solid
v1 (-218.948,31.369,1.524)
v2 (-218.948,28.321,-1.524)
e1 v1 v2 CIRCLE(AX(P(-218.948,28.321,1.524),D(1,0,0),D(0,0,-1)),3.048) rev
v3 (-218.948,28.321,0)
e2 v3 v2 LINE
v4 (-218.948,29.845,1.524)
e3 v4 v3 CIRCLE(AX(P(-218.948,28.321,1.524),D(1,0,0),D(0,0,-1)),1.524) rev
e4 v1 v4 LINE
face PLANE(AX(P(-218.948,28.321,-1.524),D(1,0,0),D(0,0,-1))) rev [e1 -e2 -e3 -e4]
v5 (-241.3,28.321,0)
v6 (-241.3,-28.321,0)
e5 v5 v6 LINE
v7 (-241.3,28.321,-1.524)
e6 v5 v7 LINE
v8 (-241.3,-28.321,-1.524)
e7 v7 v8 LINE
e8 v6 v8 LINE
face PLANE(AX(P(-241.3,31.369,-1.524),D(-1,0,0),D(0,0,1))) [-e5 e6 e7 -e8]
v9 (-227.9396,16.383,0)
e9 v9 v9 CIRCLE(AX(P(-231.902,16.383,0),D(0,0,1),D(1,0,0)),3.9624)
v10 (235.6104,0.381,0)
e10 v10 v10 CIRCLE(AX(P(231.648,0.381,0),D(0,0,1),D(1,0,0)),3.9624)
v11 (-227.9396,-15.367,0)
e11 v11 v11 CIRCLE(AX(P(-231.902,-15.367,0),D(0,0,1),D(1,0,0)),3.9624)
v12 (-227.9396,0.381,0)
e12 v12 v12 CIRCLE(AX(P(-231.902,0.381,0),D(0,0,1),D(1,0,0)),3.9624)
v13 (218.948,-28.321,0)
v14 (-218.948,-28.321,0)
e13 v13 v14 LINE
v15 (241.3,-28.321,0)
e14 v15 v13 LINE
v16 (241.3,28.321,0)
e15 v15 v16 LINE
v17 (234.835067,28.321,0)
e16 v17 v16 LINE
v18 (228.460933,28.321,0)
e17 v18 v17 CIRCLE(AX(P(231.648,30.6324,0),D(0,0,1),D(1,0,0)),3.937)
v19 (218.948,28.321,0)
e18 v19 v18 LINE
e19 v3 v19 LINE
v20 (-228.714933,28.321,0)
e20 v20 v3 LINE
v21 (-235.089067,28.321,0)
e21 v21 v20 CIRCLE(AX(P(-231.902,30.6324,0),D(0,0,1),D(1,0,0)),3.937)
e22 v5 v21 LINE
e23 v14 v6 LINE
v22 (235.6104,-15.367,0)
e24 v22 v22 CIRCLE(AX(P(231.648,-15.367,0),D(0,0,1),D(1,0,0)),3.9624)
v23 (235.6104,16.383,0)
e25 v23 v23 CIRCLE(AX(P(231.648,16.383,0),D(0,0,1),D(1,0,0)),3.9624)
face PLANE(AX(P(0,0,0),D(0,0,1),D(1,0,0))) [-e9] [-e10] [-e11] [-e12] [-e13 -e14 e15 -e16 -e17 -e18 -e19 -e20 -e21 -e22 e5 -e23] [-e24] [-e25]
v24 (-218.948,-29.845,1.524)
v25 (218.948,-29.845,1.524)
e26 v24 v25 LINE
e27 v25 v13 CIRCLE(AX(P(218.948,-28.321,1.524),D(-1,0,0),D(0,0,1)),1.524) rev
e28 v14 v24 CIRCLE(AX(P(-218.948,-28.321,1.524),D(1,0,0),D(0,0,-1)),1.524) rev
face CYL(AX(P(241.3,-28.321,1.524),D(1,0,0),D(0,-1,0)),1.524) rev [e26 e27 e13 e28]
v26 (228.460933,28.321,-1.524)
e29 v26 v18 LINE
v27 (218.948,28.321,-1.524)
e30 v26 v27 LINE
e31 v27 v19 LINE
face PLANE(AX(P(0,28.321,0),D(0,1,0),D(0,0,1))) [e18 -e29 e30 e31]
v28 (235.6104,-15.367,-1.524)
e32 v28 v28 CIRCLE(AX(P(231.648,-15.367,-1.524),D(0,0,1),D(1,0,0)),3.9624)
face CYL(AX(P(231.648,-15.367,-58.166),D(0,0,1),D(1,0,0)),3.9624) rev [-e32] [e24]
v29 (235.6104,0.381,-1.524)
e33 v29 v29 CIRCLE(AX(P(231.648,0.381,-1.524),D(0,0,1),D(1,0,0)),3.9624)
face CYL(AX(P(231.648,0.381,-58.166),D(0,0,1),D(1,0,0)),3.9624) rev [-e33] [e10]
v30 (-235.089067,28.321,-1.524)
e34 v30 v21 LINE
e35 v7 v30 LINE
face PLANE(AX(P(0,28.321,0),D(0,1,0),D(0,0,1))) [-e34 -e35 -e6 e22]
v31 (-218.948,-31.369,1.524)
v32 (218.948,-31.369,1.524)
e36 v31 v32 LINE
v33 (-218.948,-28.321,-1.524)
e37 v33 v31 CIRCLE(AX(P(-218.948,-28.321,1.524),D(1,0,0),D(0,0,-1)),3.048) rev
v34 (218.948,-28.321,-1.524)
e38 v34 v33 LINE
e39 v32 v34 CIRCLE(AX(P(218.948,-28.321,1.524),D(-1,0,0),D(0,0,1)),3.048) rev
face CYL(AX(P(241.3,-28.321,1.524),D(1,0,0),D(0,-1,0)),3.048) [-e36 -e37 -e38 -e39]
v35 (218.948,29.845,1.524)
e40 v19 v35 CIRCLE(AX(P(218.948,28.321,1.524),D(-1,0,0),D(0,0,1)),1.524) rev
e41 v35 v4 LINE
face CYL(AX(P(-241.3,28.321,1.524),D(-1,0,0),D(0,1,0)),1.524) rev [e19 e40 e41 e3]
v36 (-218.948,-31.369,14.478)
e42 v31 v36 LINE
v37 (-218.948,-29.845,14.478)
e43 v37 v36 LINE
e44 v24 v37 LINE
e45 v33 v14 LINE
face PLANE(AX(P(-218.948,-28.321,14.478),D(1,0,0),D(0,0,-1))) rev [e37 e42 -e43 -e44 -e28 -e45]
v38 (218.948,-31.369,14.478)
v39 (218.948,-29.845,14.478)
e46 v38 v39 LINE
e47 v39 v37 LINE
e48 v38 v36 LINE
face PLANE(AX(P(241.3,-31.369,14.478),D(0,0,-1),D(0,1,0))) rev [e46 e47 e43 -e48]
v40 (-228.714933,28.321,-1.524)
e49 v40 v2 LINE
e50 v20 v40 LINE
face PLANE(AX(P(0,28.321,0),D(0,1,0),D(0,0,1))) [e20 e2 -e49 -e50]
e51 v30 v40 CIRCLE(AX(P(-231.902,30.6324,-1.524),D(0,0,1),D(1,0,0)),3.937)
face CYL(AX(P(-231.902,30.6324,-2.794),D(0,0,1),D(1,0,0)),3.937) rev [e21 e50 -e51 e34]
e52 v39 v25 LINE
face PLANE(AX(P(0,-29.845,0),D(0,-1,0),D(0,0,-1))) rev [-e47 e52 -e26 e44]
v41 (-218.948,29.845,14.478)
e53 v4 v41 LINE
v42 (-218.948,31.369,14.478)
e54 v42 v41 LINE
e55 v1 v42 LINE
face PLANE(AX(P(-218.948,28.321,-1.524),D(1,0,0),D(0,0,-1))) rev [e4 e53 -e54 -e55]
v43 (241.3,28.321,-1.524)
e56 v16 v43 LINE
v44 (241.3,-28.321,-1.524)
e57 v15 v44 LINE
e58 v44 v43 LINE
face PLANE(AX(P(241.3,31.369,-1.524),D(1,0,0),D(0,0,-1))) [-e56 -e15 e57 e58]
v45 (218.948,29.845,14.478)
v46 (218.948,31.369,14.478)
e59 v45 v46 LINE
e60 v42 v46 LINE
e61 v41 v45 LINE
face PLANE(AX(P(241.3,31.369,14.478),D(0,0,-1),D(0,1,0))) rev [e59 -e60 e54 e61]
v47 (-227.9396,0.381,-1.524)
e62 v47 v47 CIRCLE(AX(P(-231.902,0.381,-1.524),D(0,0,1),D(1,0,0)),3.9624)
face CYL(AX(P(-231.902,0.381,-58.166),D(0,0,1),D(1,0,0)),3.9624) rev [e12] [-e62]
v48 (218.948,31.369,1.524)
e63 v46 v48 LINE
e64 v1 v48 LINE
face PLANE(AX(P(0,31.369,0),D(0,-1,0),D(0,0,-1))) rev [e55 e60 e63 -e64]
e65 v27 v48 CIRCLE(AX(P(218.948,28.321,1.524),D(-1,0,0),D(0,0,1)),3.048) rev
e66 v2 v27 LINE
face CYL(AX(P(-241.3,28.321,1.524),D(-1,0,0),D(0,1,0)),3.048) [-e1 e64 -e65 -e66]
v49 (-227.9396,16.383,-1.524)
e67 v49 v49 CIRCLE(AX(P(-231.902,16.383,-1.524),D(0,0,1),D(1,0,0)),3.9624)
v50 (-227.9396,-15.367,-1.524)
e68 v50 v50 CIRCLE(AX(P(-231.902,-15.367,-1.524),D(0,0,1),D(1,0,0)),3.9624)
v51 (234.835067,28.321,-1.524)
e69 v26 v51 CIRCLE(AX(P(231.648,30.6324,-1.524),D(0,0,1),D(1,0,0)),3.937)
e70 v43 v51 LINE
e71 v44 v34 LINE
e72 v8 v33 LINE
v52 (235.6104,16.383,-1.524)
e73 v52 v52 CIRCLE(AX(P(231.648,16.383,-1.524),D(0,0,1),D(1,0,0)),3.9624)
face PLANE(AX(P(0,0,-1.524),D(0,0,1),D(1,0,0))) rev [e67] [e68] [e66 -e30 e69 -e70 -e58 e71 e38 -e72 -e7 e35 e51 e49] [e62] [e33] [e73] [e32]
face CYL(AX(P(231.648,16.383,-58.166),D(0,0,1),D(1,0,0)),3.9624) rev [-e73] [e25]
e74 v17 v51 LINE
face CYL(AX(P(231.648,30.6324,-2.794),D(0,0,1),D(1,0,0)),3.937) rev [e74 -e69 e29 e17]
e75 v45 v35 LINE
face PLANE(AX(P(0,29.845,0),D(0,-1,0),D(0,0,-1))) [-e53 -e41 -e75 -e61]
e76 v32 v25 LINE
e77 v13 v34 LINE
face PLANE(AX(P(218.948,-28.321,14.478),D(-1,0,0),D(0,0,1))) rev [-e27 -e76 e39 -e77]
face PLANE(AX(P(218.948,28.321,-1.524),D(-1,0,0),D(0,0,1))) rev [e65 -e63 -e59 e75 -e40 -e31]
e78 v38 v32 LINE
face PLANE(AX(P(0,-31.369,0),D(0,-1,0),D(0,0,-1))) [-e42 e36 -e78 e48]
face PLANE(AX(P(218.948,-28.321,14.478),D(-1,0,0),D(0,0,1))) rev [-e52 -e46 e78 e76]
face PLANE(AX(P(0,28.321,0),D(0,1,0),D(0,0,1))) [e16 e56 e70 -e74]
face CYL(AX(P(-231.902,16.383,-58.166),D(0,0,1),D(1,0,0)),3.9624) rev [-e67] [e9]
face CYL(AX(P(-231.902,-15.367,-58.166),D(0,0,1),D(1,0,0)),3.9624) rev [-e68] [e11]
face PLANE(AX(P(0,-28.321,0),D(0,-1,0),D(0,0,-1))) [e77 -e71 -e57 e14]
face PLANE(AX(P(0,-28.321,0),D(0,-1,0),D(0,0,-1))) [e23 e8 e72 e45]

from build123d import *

# Parameters (mm, degrees)
CROQUIS1_W                         = 482.6
CROQUIS1_H                         = 62.738
BRIDA_BASE1_DEPTH                  = 1.524
BRIDA_DE_ARISTA1_STRIP_W           = 9.144
BRIDA_DE_ARISTA1_STRIP_H           = 1.524
BRIDA_DE_ARISTA1_STRIP_CUT_DEPTH   = 482.6
BRIDA_DE_ARISTA1_STRIP_2_W         = 9.144
BRIDA_DE_ARISTA1_STRIP_2_H         = 1.524
BRIDA_DE_ARISTA1_STRIP_CUT_2_DEPTH = 482.6
BRIDA_DE_ARISTA1_DEPTH             = 482.6
BRIDA_DE_ARISTA1_BEND_DEPTH        = 482.6
CROQUIS12_R                        = 3.9624
CORTAR_EXTRUIR1_DEPTH              = 58.166
CORTAR_EXTRUIR2_DEPTH              = 1.016
CORTAR_EXTRUIR2_DEPTH_BACK         = 3.048
CROQUIS13_W                        = 22.352
CROQUIS13_H                        = 16.002
CROQUIS14_W                        = 22.352
CROQUIS14_H                        = 16.002
CORTAR_EXTRUIR3_DEPTH              = 3.048
CROQUIS15_R                        = 3.937
CORTAR_EXTRUIR4_DEPTH              = 2.794


# Sheet-metal steps are written as plain solids
with BuildPart() as part:
    # Croquis1 → Brida base1 (new body)
    with BuildSketch(Plane.XY):
        Rectangle(CROQUIS1_W, CROQUIS1_H)
    extrude(amount=-BRIDA_BASE1_DEPTH)

    # Brida de arista1 strip (across the edge) → Brida de arista1 strip cut (cut)
    with BuildSketch(Plane(origin=(241.3, 31.369, 0), x_dir=(0, -1, 0), z_dir=(-1, 0, 0))):
        with Locations((-1.524, -0.762)):
            Rectangle(BRIDA_DE_ARISTA1_STRIP_W, BRIDA_DE_ARISTA1_STRIP_H)
    extrude(amount=BRIDA_DE_ARISTA1_STRIP_CUT_DEPTH, mode=Mode.SUBTRACT)

    # Brida de arista1 strip 2 (across the edge) → Brida de arista1 strip cut 2 (cut)
    with BuildSketch(Plane(origin=(-241.3, -31.369, 0), x_dir=(0, 1, 0), z_dir=(1, 0, 0))):
        with Locations((-1.524, -0.762)):
            Rectangle(BRIDA_DE_ARISTA1_STRIP_2_W, BRIDA_DE_ARISTA1_STRIP_2_H)
    extrude(amount=BRIDA_DE_ARISTA1_STRIP_CUT_2_DEPTH, mode=Mode.SUBTRACT)

    # Brida de arista1 section (across the edge) → Brida de arista1 (add)
    with BuildSketch(Plane(origin=(241.3, 31.369, 0), x_dir=(0, -1, 0), z_dir=(-1, 0, 0))):
        with BuildLine():
            Line((0, 1.524), (0, 14.478))
            Line((0, 14.478), (1.524, 14.478))
            Line((1.524, 14.478), (1.524, 1.524))
            ThreePointArc((1.524, 1.524), (1.970369265, 0.446369265), (3.048, 0))
            Line((3.048, 0), (3.048, -1.524))
            ThreePointArc((3.048, -1.524), (0.892738531, -0.631261469), (0, 1.524))
        make_face()
    extrude(amount=BRIDA_DE_ARISTA1_DEPTH)

    # Brida de arista1 section 2 (across the edge) → Brida de arista1 bend (add)
    with BuildSketch(Plane(origin=(-241.3, -31.369, 0), x_dir=(0, 1, 0), z_dir=(1, 0, 0))):
        with BuildLine():
            Line((0, 1.524), (0, 14.478))
            Line((0, 14.478), (1.524, 14.478))
            Line((1.524, 14.478), (1.524, 1.524))
            ThreePointArc((1.524, 1.524), (1.970369265, 0.446369265), (3.048, 0))
            Line((3.048, 0), (3.048, -1.524))
            ThreePointArc((3.048, -1.524), (0.892738531, -0.631261469), (0, 1.524))
        make_face()
    extrude(amount=BRIDA_DE_ARISTA1_BEND_DEPTH)

    # Croquis12 → Cortar-Extruir1 (cut)
    with BuildSketch(Plane.XY):
        with Locations((231.648, 16.383)):
            Circle(CROQUIS12_R)
        with Locations((231.648, 0.381)):
            Circle(CROQUIS12_R)
        with Locations((231.648, -15.367)):
            Circle(CROQUIS12_R)
        with Locations((-231.902, 16.383)):
            Circle(CROQUIS12_R)
        with Locations((-231.902, 0.381)):
            Circle(CROQUIS12_R)
        with Locations((-231.902, -15.367)):
            Circle(CROQUIS12_R)
    extrude(amount=-CORTAR_EXTRUIR1_DEPTH, mode=Mode.SUBTRACT)

    # Croquis13 → Cortar-Extruir2 (cut, two sides: drawn at the far end of the back side and taken through both)
    with BuildSketch(Plane(origin=(0, 31.369, 0), x_dir=(1, 0, 0), z_dir=(0, 1, 0)).offset(-CORTAR_EXTRUIR2_DEPTH_BACK)):
        with Locations((230.124, -6.477)):
            Rectangle(CROQUIS13_W, CROQUIS13_H)
        with Locations((-230.124, -6.477)):
            Rectangle(CROQUIS13_W, CROQUIS13_H)
    extrude(amount=CORTAR_EXTRUIR2_DEPTH + CORTAR_EXTRUIR2_DEPTH_BACK, mode=Mode.SUBTRACT)

    # Croquis14 → Cortar-Extruir3 (cut)
    with BuildSketch(Plane.XZ.offset(31.369)):
        with Locations((-230.124, 6.477)):
            Rectangle(CROQUIS14_W, CROQUIS14_H)
        with Locations((230.124, 6.477)):
            Rectangle(CROQUIS14_W, CROQUIS14_H)
    extrude(amount=-CORTAR_EXTRUIR3_DEPTH, mode=Mode.SUBTRACT)

    # Croquis15 → Cortar-Extruir4 (cut)
    with BuildSketch(Plane.XY):
        with Locations((-231.902, 30.6324)):
            Circle(CROQUIS15_R)
        with Locations((231.648, 30.6324)):
            Circle(CROQUIS15_R)
    extrude(amount=-CORTAR_EXTRUIR4_DEPTH, mode=Mode.SUBTRACT)


solid = part.part
